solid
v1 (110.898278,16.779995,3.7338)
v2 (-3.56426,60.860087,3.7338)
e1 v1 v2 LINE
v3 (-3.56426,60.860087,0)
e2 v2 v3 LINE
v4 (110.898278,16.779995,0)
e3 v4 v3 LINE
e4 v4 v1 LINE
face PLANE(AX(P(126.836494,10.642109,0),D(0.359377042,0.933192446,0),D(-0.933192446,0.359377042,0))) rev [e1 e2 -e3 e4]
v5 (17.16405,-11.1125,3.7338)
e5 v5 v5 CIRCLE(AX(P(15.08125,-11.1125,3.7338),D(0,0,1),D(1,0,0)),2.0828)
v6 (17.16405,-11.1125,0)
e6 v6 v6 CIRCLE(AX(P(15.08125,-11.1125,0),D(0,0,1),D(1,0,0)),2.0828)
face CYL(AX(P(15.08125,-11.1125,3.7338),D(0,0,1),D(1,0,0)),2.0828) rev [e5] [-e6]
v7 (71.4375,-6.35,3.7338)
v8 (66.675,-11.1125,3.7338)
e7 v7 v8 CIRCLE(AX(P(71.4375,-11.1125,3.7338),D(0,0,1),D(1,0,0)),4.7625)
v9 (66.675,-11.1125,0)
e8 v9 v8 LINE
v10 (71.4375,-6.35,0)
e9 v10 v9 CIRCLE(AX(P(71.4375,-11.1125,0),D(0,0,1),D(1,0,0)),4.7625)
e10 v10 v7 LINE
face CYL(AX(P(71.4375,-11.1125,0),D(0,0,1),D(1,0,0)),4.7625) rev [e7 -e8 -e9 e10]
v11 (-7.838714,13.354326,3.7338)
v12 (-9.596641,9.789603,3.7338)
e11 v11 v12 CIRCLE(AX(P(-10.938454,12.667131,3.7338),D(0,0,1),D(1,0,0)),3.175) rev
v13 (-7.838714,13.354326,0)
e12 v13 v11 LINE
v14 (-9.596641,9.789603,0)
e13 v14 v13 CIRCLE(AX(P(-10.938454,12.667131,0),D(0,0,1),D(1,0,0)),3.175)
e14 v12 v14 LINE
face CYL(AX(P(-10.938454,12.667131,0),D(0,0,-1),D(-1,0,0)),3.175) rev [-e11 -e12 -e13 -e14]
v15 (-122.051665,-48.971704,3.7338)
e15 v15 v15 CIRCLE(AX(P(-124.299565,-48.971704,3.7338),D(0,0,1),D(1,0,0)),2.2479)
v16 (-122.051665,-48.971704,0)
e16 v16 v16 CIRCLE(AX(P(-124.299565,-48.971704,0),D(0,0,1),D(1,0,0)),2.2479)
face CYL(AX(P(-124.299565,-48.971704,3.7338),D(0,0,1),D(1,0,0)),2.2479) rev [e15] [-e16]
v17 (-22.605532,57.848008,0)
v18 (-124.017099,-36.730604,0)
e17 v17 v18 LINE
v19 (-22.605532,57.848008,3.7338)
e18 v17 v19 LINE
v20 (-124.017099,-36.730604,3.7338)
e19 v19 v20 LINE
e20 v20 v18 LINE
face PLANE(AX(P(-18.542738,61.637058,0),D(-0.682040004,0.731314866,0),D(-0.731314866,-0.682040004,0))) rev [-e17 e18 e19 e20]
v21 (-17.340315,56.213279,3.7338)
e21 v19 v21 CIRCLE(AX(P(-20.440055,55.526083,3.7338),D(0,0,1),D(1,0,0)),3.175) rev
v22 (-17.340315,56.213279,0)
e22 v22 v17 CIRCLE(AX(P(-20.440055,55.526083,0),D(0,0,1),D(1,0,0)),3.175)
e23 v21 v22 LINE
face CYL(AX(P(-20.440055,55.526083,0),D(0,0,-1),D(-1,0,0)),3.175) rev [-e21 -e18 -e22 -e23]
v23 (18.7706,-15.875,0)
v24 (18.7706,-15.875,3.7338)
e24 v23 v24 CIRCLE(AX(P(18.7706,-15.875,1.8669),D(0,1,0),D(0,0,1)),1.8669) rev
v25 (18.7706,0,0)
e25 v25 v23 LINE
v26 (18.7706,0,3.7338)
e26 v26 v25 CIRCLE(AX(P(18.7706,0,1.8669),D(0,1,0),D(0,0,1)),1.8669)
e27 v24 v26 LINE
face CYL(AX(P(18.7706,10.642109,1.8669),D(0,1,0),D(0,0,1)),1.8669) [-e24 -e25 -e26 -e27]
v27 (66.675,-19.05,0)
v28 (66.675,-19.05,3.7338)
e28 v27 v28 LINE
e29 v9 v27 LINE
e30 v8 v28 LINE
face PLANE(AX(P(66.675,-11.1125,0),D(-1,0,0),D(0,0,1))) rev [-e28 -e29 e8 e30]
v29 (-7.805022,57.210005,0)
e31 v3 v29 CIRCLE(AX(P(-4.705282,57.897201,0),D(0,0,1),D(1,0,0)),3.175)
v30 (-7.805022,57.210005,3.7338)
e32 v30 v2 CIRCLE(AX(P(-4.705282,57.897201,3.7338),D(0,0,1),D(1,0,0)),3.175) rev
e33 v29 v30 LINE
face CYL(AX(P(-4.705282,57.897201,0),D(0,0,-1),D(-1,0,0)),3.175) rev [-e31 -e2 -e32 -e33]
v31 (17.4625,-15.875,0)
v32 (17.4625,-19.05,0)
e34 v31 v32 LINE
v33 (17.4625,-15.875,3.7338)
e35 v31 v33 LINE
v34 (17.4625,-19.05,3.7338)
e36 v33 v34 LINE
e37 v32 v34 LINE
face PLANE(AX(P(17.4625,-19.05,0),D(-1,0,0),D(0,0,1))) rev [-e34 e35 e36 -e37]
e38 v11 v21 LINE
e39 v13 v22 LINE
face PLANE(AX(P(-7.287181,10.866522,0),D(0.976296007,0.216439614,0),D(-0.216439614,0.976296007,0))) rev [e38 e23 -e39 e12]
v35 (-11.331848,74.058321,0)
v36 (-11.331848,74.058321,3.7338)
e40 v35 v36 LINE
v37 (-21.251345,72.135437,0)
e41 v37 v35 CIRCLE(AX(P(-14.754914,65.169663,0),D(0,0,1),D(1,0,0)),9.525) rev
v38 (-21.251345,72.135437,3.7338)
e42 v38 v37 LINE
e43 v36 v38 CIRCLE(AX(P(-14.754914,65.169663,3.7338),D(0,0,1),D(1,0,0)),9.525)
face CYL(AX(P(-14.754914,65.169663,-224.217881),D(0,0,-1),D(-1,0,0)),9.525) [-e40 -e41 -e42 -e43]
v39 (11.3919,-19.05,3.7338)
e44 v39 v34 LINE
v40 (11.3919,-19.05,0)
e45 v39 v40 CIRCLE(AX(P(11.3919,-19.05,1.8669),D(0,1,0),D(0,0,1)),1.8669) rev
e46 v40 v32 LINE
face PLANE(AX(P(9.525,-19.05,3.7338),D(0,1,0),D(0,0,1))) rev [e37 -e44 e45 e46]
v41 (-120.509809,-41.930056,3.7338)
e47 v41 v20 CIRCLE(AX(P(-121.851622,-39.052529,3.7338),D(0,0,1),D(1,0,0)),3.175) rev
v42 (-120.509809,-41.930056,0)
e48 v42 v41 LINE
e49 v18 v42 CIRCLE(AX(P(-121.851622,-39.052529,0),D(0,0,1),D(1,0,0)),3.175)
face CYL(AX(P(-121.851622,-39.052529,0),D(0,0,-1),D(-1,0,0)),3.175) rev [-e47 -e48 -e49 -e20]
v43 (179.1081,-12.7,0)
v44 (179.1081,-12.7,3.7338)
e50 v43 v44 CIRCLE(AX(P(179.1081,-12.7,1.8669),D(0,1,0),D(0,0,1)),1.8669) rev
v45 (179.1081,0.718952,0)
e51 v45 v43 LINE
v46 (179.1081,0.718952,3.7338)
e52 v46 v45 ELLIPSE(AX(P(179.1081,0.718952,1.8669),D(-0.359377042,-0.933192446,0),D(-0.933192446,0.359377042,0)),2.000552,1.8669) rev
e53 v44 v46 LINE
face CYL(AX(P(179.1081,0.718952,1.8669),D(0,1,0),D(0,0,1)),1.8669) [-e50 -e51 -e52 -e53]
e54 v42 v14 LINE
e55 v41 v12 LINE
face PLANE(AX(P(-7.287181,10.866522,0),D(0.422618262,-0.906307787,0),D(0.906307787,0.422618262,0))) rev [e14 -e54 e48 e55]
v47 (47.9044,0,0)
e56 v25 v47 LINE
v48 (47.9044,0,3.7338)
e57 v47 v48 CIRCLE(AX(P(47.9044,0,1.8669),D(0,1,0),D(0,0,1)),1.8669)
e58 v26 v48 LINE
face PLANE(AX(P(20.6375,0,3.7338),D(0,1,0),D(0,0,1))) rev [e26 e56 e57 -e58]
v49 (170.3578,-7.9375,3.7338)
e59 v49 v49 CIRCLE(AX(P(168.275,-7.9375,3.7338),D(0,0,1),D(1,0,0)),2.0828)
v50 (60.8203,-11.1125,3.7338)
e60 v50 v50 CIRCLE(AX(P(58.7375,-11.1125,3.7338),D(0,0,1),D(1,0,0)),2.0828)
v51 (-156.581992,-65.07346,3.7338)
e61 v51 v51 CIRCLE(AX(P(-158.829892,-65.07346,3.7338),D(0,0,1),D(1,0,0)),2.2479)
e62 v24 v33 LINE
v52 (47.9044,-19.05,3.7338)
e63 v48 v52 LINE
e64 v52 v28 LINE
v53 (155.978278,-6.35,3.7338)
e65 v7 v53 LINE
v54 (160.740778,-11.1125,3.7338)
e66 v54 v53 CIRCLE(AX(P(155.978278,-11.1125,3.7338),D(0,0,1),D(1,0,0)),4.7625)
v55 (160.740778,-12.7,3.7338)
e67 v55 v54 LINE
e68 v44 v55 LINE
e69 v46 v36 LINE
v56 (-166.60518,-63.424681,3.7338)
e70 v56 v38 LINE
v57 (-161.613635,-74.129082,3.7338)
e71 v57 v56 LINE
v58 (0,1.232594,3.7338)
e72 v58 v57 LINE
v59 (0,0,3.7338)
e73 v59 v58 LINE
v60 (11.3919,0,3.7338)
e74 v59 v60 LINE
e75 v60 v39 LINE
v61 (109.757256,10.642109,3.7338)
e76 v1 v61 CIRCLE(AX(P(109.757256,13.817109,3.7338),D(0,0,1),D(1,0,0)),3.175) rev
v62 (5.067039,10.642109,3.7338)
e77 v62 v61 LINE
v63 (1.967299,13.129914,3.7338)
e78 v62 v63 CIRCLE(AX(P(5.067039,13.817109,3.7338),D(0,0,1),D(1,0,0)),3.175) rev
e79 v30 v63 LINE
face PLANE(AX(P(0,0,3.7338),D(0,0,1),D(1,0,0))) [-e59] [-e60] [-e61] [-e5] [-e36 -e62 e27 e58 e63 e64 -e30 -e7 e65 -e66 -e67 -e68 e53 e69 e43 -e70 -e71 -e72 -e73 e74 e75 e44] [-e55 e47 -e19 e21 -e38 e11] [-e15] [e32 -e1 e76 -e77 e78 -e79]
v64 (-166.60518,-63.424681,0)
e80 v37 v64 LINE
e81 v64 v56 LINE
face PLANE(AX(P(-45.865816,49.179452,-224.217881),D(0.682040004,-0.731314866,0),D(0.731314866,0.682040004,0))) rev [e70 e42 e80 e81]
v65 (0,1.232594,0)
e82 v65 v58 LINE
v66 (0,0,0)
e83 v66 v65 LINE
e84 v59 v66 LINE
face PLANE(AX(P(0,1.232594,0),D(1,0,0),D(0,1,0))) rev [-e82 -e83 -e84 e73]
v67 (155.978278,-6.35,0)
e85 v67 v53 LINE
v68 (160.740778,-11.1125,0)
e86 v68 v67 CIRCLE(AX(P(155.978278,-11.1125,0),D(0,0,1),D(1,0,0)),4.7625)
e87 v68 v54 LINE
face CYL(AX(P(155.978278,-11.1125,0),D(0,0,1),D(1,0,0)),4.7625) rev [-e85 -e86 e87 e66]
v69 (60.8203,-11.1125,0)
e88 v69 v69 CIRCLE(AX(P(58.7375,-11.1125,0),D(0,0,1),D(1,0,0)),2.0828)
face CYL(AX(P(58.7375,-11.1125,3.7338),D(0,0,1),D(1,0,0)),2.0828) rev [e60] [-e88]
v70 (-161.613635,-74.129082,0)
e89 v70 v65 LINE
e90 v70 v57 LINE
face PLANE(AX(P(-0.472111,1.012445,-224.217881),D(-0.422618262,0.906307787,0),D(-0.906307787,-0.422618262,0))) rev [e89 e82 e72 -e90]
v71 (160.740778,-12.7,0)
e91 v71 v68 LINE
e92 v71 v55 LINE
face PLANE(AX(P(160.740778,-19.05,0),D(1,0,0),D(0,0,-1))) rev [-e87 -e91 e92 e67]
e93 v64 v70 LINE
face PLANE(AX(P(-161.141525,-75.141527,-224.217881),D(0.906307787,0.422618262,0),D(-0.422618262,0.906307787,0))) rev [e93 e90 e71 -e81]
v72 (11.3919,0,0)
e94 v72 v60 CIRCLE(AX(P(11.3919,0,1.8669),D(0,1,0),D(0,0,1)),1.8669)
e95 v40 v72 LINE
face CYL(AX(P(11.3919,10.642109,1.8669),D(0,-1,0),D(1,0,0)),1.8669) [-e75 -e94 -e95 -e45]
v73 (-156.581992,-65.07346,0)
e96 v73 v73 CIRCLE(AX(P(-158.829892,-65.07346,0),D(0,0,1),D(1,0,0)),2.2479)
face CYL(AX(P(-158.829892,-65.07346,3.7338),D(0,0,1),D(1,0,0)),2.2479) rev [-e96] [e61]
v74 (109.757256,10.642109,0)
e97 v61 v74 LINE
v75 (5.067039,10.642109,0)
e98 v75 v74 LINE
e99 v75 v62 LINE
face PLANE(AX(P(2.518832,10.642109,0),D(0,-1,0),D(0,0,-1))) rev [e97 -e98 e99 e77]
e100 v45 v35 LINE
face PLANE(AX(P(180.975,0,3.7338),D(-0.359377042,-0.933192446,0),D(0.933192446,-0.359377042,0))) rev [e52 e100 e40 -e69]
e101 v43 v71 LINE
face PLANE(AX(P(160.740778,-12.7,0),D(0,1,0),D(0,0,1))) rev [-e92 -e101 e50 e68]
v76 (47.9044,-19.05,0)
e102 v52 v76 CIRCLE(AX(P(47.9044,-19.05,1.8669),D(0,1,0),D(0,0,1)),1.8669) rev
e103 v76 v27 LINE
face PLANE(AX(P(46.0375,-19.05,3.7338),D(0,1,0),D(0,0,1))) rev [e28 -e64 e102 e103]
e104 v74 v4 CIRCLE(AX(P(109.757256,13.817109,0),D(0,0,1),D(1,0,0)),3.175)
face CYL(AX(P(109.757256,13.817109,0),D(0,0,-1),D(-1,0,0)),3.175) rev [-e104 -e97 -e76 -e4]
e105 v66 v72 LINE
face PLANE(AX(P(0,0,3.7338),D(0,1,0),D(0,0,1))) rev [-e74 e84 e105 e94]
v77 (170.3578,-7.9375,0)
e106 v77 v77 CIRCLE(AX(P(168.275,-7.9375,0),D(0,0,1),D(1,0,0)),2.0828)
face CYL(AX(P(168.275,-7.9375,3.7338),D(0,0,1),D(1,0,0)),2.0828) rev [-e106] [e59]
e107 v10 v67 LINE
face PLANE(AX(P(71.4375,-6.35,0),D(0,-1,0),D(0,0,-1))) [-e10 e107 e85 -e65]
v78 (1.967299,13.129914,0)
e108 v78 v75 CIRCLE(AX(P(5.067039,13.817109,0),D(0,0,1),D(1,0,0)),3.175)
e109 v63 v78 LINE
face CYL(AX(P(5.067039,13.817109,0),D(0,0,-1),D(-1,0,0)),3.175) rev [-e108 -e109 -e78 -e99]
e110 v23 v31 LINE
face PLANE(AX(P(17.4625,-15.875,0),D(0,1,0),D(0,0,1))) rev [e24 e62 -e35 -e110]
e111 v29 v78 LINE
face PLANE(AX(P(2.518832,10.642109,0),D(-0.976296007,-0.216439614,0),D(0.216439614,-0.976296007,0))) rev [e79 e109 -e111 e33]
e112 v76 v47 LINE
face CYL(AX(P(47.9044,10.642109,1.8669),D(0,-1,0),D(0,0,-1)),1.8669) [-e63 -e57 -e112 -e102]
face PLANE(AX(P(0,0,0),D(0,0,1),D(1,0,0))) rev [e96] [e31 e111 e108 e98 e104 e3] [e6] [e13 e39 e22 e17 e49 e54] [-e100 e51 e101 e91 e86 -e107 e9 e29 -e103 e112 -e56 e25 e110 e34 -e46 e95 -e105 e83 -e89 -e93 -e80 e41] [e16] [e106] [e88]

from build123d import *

# Parameters (mm, degrees)
BOSS_EXTRUDE1_DEPTH     = 3.7338
BOSS_EXTRUDE2_DEPTH     = 3.7338
CUT_EXTRUDE1_DEPTH      = 197.398400929
FILLET7_R               = 9.525
FILLET8_R               = 3.175
F_8_32_TAPPED_HOLE2_D   = 4.1656
FILLET3_RADIUS          = 1.8669
FILLET3_LENGTH          = 19.05
FILLET4_RADIUS          = 1.8669
FILLET4_LENGTH          = 19.05
FILLET5_RADIUS          = 1.8669
FILLET5_LENGTH          = 19.05
FILLET6_START           = -20
FILLET6_DEPTH           = 22
CUT_EXTRUDE2_START      = -5
CUT_EXTRUDE2_OUTLINE_R  = 2.2479
CUT_EXTRUDE2_DEPTH      = 6
CUT_EXTRUDE3_DEPTH      = 196.819265209
SKETCH15_W              = 94.065777876
SKETCH15_H              = 7.9375
CUT_EXTRUDE4_DEPTH      = 196.819265209
SKETCH16_W              = 20.234222124
SKETCH16_H              = 6.35
CUT_EXTRUDE5_DEPTH      = 196.819265209
CUT_EXTRUDE6_DEPTH      = 196.819265209
CUT_EXTRUDE6_DEPTH_BACK = 196.819265209
SKETCH17_W              = 3.175
SKETCH17_H              = 3.175


with BuildPart() as part:
    # Sketch1 → Boss-Extrude1 (new body)
    with BuildSketch(Plane.XY):
        Polygon((0, 0), (9.525, 0), (9.525, -19.05), (20.6375, -19.05), (20.6375, 0), (46.0375, 0), (46.0375, -19.05), (180.975, -19.05), (180.975, 0), (-16.893133293, 76.2), align=None)
    extrude(amount=BOSS_EXTRUDE1_DEPTH)

    # Sketch7 → Boss-Extrude2 (add)
    with BuildSketch(Plane.XY.offset(3.7338)):
        Polygon((-161.613635382, -74.129081959), (-0.247657199, 1.117109433), (-16.893133293, 76.2), (-166.605179671, -63.424680687), align=None)
    extrude(amount=-BOSS_EXTRUDE2_DEPTH)

    # Sketch8 → Cut-Extrude1 (cut, through all)
    with BuildSketch(Plane.XY.offset(3.7338)):
        Polygon((2.518832326, 10.642109433), (126.836493994, 10.642109433), (-9.085614858, 62.98638803), align=None)
        Polygon((-18.542737866, 61.637057548), (-138.674453357, -50.400369109), (-7.28718114, 10.86652211), align=None)
    extrude(amount=-CUT_EXTRUDE1_DEPTH, mode=Mode.SUBTRACT)

    # Fillet7
    fillet7_edges = [part.edges().sort_by_distance(p)[0] for p in [
        (-16.893133293, 76.2, 1.8669),
    ]]
    fillet(fillet7_edges, radius=FILLET7_R)

    # Fillet8
    fillet8_edges = [part.edges().sort_by_distance(p)[0] for p in [
        (-9.085614858, 62.98638803, 1.8669),
        (126.836493994, 10.642109433, 1.8669),
        (2.518832326, 10.642109433, 1.8669),
        (-7.28718114, 10.86652211, 1.8669),
        (-138.674453357, -50.400369109, 1.8669),
        (-18.542737866, 61.637057548, 1.8669),
    ]]
    fillet(fillet8_edges, radius=FILLET8_R)

    # #8-32 Tapped Hole2 (through all)
    with Locations(Plane.XY.offset(3.7338)):
        with Locations((15.08125, -11.1125), (58.7375, -11.1125), (168.275, -7.9375)):
            Hole(F_8_32_TAPPED_HOLE2_D / 2)

    # Fillet3: full round fillet: the end face becomes a half cylinder, R = half its width
    fillet3_face = Plane((9.525, -9.525, 1.8669), x_dir=(0, 1, 0), z_dir=(-1, 0, 0))  # on the end face: x along it, z out of the body
    fillet3_slab = fillet3_face.offset(-FILLET3_RADIUS / 2) * Box(FILLET3_LENGTH, 2 * FILLET3_RADIUS, FILLET3_RADIUS, mode=Mode.PRIVATE)  # the body's end, R deep
    fillet3_round = Plane((11.3919, -9.525, 1.8669), x_dir=(-1, 0, 0), z_dir=(0, 1, 0)) * Cylinder(FILLET3_RADIUS, FILLET3_LENGTH, mode=Mode.PRIVATE)  # its axis R under the face
    add(fillet3_slab - fillet3_round, mode=Mode.SUBTRACT)

    # Fillet4: full round fillet: the end face becomes a half cylinder, R = half its width
    fillet4_face = Plane((20.6375, -9.525, 1.8669), x_dir=(0, 1, 0), z_dir=(1, 0, 0))  # on the end face: x along it, z out of the body
    fillet4_slab = fillet4_face.offset(-FILLET4_RADIUS / 2) * Box(FILLET4_LENGTH, 2 * FILLET4_RADIUS, FILLET4_RADIUS, mode=Mode.PRIVATE)  # the body's end, R deep
    fillet4_round = Plane((18.7706, -9.525, 1.8669), x_dir=(1, 0, 0), z_dir=(0, 1, 0)) * Cylinder(FILLET4_RADIUS, FILLET4_LENGTH, mode=Mode.PRIVATE)  # its axis R under the face
    add(fillet4_slab - fillet4_round, mode=Mode.SUBTRACT)

    # Fillet5: full round fillet: the end face becomes a half cylinder, R = half its width
    fillet5_face = Plane((46.0375, -9.525, 1.8669), x_dir=(0, -1, 0), z_dir=(-1, 0, 0))  # on the end face: x along it, z out of the body
    fillet5_slab = fillet5_face.offset(-FILLET5_RADIUS / 2) * Box(FILLET5_LENGTH, 2 * FILLET5_RADIUS, FILLET5_RADIUS, mode=Mode.PRIVATE)  # the body's end, R deep
    fillet5_round = Plane((47.9044, -9.525, 1.8669), x_dir=(-1, 0, 0), z_dir=(0, -1, 0)) * Cylinder(FILLET5_RADIUS, FILLET5_LENGTH, mode=Mode.PRIVATE)  # its axis R under the face
    add(fillet5_slab - fillet5_round, mode=Mode.SUBTRACT)

    # Fillet6: read off the stored shape, not the designer's step
    # Fillet6 outline → Fillet6 (cut)
    with BuildSketch(Plane(origin=(0, 0, 0), x_dir=(1, 0, 0), z_dir=(0, 1, 0)).offset(FILLET6_START)):
        with BuildLine():
            ThreePointArc((179.1081, 0), (180.42819765, -0.54680235), (180.975, -1.8669))
            Line((180.975, -1.8669), (180.975, 0))
            Line((180.975, 0), (179.1081, 0))
        make_face()
        with BuildLine():
            ThreePointArc((180.975, -1.8669), (180.42819765, -3.18699765), (179.1081, -3.7338))
            Line((179.1081, -3.7338), (180.975, -3.7338))
            Line((180.975, -3.7338), (180.975, -1.8669))
        make_face()
    extrude(amount=FILLET6_DEPTH, mode=Mode.SUBTRACT)

    # Cut-Extrude2: read off the stored shape, not the designer's step
    # Cut-Extrude2 outline → Cut-Extrude2 (cut)
    with BuildSketch(Plane.XY.offset(3.7338).offset(CUT_EXTRUDE2_START)):
        with Locations((-124.299564913, -48.97170394)):
            Circle(CUT_EXTRUDE2_OUTLINE_R)
        with Locations((-158.829891599, -65.073459713)):
            Circle(CUT_EXTRUDE2_OUTLINE_R)
        Polygon((-0.247657199, 1.117109433), (0, 0), (0, 1.232593882), align=None)
    extrude(amount=CUT_EXTRUDE2_DEPTH, mode=Mode.SUBTRACT)

    # Sketch14 → Cut-Extrude3 (cut, through all)
    with BuildSketch(Plane.XY.offset(3.7338)):
        with BuildLine():
            Line((71.4375, -6.35), (155.978277876, -6.35))
            ThreePointArc((155.978277876, -6.35), (160.740777876, -11.1125), (155.978277876, -15.875))
            Line((155.978277876, -15.875), (71.4375, -15.875))
            ThreePointArc((71.4375, -15.875), (66.675, -11.1125), (71.4375, -6.35))
        make_face()
    extrude(amount=-CUT_EXTRUDE3_DEPTH, mode=Mode.SUBTRACT)

    # Sketch15 → Cut-Extrude4 (cut, through all)
    with BuildSketch(Plane.XY.offset(3.7338)):
        with Locations((113.707888938, -15.08125)):
            Rectangle(SKETCH15_W, SKETCH15_H)
    extrude(amount=-CUT_EXTRUDE4_DEPTH, mode=Mode.SUBTRACT)

    # Sketch16 → Cut-Extrude5 (cut, through all)
    with BuildSketch(Plane.XY.offset(3.7338)):
        with Locations((170.857888938, -15.875)):
            Rectangle(SKETCH16_W, SKETCH16_H)
    extrude(amount=-CUT_EXTRUDE5_DEPTH, mode=Mode.SUBTRACT)

    # Sketch17 → Cut-Extrude6 (cut, two sides: drawn at the far end of the back side and taken through both)
    with BuildSketch(Plane.XY.offset(3.7338).offset(-CUT_EXTRUDE6_DEPTH_BACK)):
        with Locations((19.05, -17.4625)):
            Rectangle(SKETCH17_W, SKETCH17_H)
    extrude(amount=CUT_EXTRUDE6_DEPTH + CUT_EXTRUDE6_DEPTH_BACK, mode=Mode.SUBTRACT)


solid = part.part
